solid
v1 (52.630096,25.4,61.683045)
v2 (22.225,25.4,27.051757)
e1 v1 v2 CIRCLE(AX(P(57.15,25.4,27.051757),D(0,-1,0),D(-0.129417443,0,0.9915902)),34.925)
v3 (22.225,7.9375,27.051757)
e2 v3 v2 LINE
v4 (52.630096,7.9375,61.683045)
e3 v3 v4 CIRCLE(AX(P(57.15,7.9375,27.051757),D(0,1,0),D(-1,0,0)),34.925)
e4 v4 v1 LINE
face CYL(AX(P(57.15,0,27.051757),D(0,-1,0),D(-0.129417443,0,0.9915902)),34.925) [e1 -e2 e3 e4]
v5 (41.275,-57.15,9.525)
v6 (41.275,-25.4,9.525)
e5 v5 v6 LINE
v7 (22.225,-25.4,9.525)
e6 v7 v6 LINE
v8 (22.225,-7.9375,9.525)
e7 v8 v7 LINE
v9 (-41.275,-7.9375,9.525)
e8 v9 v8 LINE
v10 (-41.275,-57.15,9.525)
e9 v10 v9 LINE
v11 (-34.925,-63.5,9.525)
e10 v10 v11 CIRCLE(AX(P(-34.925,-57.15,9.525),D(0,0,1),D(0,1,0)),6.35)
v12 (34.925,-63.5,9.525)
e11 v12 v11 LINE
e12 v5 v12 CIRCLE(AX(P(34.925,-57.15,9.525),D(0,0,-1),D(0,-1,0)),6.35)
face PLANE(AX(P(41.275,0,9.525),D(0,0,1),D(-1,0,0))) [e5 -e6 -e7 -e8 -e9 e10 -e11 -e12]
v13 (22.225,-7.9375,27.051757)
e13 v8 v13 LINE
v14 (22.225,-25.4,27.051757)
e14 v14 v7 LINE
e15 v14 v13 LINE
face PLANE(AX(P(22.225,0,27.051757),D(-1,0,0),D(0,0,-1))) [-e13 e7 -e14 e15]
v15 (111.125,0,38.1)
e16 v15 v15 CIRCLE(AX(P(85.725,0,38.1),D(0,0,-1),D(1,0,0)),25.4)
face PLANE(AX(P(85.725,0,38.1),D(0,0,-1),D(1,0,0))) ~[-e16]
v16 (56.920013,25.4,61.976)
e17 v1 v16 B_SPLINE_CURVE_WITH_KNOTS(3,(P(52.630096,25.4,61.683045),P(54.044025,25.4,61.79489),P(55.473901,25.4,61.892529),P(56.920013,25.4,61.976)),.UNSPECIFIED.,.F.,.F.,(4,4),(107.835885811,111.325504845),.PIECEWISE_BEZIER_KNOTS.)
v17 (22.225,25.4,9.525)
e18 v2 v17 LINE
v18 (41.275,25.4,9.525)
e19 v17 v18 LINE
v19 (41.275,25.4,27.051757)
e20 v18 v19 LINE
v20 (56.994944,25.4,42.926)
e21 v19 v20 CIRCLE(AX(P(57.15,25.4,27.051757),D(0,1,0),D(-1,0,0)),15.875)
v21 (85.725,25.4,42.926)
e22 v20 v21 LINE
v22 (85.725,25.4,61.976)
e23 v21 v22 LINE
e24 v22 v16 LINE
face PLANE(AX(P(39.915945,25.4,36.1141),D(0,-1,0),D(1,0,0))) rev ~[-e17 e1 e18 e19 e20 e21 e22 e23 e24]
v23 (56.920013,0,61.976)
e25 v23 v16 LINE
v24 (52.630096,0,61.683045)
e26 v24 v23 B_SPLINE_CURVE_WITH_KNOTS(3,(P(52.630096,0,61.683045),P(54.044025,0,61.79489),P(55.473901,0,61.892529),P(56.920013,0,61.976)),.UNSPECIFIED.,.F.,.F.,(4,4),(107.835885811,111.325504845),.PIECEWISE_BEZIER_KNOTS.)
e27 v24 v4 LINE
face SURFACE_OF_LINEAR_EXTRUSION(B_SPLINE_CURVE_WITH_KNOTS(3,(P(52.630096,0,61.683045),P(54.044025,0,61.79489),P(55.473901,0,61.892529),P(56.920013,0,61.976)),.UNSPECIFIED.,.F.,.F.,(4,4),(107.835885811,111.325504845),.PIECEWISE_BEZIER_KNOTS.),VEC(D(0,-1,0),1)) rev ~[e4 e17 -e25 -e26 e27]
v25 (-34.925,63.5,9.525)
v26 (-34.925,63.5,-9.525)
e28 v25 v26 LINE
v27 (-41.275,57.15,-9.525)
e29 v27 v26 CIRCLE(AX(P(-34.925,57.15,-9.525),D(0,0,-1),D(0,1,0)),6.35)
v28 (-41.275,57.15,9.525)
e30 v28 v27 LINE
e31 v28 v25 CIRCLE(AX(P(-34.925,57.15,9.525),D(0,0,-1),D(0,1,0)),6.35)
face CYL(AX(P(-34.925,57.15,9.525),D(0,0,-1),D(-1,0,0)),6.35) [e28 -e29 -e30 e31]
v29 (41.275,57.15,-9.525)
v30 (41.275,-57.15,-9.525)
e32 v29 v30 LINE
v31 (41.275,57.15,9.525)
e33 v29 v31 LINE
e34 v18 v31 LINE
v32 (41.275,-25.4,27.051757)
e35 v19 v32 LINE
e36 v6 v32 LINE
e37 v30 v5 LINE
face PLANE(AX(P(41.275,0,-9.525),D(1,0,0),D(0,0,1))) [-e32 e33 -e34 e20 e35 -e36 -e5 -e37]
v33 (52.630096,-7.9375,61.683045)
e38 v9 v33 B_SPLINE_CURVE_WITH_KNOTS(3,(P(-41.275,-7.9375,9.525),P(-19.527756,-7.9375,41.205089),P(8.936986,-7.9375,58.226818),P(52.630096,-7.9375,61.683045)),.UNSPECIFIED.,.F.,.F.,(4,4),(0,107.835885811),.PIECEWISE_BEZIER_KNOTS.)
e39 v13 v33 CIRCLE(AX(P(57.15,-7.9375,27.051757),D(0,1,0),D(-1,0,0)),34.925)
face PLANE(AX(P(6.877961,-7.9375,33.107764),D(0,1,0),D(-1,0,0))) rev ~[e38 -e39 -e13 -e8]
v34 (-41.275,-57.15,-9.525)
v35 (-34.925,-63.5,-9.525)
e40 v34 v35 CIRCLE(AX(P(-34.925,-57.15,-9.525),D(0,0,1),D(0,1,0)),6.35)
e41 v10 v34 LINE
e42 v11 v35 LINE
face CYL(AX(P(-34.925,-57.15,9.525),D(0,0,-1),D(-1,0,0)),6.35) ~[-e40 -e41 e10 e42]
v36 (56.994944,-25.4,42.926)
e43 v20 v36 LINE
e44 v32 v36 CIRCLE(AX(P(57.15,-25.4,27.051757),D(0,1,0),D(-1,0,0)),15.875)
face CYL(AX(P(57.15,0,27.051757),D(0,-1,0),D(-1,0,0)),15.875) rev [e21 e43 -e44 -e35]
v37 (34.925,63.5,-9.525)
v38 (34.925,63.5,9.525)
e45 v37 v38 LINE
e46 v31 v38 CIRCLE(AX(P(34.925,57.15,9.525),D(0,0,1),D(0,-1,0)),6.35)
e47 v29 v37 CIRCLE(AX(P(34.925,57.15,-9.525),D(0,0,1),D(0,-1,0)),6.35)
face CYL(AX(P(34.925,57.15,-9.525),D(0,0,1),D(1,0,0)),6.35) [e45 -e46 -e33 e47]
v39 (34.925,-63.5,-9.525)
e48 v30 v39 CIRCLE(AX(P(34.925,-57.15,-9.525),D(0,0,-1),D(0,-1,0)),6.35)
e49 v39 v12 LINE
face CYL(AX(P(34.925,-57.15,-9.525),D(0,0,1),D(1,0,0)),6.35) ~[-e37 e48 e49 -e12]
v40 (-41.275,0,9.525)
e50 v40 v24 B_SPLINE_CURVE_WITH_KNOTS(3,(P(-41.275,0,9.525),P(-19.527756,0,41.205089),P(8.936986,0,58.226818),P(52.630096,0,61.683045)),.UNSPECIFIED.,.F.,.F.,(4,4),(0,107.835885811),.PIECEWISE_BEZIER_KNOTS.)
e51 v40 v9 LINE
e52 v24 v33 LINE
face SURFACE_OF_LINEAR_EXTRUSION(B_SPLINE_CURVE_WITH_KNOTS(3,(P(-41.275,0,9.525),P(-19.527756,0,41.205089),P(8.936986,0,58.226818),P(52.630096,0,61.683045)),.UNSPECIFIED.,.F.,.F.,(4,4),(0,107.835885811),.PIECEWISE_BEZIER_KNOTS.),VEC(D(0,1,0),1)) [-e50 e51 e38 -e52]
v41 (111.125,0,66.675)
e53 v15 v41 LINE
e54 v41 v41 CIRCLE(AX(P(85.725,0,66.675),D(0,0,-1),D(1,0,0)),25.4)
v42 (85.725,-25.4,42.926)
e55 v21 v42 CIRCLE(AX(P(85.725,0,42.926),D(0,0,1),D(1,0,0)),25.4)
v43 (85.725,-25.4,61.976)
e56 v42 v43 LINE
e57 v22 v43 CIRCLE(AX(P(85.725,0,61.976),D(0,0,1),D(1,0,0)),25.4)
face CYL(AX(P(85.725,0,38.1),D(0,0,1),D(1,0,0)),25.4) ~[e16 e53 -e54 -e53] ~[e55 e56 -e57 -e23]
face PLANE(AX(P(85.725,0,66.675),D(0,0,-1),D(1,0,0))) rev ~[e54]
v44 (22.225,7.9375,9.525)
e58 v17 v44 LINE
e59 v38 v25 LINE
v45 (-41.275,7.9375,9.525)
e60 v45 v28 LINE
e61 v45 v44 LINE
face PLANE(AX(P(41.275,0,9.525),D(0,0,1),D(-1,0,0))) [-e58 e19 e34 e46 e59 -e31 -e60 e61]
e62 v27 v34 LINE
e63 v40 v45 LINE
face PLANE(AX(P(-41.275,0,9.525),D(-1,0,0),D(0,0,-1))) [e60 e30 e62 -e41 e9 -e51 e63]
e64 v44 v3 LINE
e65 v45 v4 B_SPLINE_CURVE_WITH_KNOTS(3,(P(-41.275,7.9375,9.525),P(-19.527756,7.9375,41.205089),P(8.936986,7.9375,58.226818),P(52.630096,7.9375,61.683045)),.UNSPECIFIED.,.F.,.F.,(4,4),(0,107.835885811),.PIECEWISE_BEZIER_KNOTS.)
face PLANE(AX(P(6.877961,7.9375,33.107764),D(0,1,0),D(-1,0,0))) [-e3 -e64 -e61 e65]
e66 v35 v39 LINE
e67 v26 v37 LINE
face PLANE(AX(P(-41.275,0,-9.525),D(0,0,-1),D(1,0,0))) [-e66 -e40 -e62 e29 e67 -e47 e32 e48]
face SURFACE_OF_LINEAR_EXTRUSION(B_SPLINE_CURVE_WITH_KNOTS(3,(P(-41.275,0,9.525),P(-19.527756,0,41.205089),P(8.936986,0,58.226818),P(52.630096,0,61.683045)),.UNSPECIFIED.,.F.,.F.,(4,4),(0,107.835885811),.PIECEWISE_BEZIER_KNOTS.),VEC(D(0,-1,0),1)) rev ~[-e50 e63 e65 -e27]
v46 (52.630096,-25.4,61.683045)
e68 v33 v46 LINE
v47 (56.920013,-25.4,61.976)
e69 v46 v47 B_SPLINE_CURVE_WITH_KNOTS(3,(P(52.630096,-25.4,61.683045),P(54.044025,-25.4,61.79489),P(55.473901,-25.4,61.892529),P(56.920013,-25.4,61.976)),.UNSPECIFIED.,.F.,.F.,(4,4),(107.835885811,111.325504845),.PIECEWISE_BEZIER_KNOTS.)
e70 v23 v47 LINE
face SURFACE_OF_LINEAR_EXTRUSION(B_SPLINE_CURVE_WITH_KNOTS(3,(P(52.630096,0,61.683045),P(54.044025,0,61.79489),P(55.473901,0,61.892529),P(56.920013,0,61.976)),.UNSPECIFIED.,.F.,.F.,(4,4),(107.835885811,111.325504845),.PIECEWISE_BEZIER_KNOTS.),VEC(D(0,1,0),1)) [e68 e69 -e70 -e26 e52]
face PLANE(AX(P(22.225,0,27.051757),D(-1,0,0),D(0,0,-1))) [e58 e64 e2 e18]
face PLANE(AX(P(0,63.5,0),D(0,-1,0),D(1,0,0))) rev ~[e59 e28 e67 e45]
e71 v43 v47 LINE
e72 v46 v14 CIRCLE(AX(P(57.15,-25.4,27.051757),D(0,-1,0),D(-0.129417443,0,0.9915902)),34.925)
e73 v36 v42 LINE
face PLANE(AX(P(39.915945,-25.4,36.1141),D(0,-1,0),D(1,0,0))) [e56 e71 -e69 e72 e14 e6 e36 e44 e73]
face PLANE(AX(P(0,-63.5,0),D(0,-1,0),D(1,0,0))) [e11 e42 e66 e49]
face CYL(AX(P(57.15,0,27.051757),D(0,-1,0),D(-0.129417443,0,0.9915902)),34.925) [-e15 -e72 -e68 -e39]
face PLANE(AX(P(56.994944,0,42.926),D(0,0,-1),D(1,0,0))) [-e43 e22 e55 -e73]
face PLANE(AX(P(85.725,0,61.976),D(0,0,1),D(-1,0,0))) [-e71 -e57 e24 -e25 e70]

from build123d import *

# Parameters (mm, degrees)
F1_DEPTH = 63.5
F0_W     = 25.4
F0_H     = 19.05
F2_DEPTH = 25.4
F3_DEPTH = 7.9375
F5_R     = 6.35


# Not quite as in the source:
# - a feature names something its author has since deleted; it is built from what else it names


with BuildPart() as f1:
    # F0 (on Front) → F1 (new body, symmetric)
    with BuildSketch(Plane.XZ):
        Polygon((22.225, 9.525), (-41.275, 9.525), (-41.275, -9.525), (41.275, -9.525), (41.275, 9.525), align=None)
    extrude(amount=F1_DEPTH, both=True)



with BuildPart() as f2:
    # F0 (on Front) → F2 (new body, symmetric)
    with BuildSketch(Plane.XZ):
        with BuildLine():
            Line((22.225, 27.0517572581), (22.225, 9.525))
            Line((22.225, 9.525), (41.275, 9.525))
            Line((41.275, 9.525), (41.275, 27.0517572581))
            ThreePointArc((41.275, 27.0517572581), (45.8699924784, 38.2221223064), (56.9949439764, 42.926))
            Line((56.9949439764, 42.926), (60.325, 42.926))
            Line((60.325, 42.926), (60.325, 61.976))
            Line((60.325, 61.976), (56.9200132545, 61.976))
            add(Edge.make_bspline(
                [(52.6300958014, 61.6830450054), (54.0440250085, 61.794890112), (55.4739013545, 61.892529432), (56.9200132545, 61.976)],
                knots=[107.8358858106, 107.8358858106, 107.8358858106, 107.8358858106, 111.3255048452, 111.3255048452, 111.3255048452, 111.3255048452], degree=3))
            ThreePointArc((52.6300958014, 61.6830450054), (30.9048739845, 50.0940875532), (22.225, 27.0517572581))
        make_face()
        with Locations((73.025, 52.451)):
            Rectangle(F0_W, F0_H)
    extrude(amount=F2_DEPTH, both=True)


with BuildPart() as f1_1:
    add(f1.part)

    add(f2.part)  # F3 merges F2
    # F0 (on Front) → F3 (join, symmetric)
    with BuildSketch(Plane.XZ):
        with BuildLine():
            add(Edge.make_bspline(
                [(-41.275, 9.525), (-19.5277563413, 41.2050885172), (8.9369857489, 58.2268178266), (52.6300958014, 61.6830450054)],
                knots=[0, 0, 0, 0, 107.8358858106, 107.8358858106, 107.8358858106, 107.8358858106], degree=3))
            Line((-41.275, 9.525), (22.225, 9.525))
            Line((22.225, 9.525), (22.225, 27.0517572581))
            ThreePointArc((22.225, 27.0517572581), (30.9048739845, 50.0940875532), (52.6300958014, 61.6830450054))
        make_face()
    extrude(amount=F3_DEPTH, both=True)

    # F0 (on Front) → F4 (revolve)
    with BuildSketch(Plane.XZ):
        Polygon((85.725, 66.675), (85.725, 61.976), (85.725, 42.926), (85.725, 38.1), (111.125, 38.1), (111.125, 66.675), align=None)
    revolve(axis=Axis((85.725, 0, 52.3875), (0, 0, -1)))

    # F5
    f5_edges = [f1_1.edges().sort_by_distance(p)[0] for p in [
        (-41.275, -63.5, 0),
        (41.275, -63.5, 0),
        (41.275, 63.5, 0),
        (-41.275, 63.5, 0),
    ]]
    fillet(f5_edges, radius=F5_R)


solid = f1_1.part
